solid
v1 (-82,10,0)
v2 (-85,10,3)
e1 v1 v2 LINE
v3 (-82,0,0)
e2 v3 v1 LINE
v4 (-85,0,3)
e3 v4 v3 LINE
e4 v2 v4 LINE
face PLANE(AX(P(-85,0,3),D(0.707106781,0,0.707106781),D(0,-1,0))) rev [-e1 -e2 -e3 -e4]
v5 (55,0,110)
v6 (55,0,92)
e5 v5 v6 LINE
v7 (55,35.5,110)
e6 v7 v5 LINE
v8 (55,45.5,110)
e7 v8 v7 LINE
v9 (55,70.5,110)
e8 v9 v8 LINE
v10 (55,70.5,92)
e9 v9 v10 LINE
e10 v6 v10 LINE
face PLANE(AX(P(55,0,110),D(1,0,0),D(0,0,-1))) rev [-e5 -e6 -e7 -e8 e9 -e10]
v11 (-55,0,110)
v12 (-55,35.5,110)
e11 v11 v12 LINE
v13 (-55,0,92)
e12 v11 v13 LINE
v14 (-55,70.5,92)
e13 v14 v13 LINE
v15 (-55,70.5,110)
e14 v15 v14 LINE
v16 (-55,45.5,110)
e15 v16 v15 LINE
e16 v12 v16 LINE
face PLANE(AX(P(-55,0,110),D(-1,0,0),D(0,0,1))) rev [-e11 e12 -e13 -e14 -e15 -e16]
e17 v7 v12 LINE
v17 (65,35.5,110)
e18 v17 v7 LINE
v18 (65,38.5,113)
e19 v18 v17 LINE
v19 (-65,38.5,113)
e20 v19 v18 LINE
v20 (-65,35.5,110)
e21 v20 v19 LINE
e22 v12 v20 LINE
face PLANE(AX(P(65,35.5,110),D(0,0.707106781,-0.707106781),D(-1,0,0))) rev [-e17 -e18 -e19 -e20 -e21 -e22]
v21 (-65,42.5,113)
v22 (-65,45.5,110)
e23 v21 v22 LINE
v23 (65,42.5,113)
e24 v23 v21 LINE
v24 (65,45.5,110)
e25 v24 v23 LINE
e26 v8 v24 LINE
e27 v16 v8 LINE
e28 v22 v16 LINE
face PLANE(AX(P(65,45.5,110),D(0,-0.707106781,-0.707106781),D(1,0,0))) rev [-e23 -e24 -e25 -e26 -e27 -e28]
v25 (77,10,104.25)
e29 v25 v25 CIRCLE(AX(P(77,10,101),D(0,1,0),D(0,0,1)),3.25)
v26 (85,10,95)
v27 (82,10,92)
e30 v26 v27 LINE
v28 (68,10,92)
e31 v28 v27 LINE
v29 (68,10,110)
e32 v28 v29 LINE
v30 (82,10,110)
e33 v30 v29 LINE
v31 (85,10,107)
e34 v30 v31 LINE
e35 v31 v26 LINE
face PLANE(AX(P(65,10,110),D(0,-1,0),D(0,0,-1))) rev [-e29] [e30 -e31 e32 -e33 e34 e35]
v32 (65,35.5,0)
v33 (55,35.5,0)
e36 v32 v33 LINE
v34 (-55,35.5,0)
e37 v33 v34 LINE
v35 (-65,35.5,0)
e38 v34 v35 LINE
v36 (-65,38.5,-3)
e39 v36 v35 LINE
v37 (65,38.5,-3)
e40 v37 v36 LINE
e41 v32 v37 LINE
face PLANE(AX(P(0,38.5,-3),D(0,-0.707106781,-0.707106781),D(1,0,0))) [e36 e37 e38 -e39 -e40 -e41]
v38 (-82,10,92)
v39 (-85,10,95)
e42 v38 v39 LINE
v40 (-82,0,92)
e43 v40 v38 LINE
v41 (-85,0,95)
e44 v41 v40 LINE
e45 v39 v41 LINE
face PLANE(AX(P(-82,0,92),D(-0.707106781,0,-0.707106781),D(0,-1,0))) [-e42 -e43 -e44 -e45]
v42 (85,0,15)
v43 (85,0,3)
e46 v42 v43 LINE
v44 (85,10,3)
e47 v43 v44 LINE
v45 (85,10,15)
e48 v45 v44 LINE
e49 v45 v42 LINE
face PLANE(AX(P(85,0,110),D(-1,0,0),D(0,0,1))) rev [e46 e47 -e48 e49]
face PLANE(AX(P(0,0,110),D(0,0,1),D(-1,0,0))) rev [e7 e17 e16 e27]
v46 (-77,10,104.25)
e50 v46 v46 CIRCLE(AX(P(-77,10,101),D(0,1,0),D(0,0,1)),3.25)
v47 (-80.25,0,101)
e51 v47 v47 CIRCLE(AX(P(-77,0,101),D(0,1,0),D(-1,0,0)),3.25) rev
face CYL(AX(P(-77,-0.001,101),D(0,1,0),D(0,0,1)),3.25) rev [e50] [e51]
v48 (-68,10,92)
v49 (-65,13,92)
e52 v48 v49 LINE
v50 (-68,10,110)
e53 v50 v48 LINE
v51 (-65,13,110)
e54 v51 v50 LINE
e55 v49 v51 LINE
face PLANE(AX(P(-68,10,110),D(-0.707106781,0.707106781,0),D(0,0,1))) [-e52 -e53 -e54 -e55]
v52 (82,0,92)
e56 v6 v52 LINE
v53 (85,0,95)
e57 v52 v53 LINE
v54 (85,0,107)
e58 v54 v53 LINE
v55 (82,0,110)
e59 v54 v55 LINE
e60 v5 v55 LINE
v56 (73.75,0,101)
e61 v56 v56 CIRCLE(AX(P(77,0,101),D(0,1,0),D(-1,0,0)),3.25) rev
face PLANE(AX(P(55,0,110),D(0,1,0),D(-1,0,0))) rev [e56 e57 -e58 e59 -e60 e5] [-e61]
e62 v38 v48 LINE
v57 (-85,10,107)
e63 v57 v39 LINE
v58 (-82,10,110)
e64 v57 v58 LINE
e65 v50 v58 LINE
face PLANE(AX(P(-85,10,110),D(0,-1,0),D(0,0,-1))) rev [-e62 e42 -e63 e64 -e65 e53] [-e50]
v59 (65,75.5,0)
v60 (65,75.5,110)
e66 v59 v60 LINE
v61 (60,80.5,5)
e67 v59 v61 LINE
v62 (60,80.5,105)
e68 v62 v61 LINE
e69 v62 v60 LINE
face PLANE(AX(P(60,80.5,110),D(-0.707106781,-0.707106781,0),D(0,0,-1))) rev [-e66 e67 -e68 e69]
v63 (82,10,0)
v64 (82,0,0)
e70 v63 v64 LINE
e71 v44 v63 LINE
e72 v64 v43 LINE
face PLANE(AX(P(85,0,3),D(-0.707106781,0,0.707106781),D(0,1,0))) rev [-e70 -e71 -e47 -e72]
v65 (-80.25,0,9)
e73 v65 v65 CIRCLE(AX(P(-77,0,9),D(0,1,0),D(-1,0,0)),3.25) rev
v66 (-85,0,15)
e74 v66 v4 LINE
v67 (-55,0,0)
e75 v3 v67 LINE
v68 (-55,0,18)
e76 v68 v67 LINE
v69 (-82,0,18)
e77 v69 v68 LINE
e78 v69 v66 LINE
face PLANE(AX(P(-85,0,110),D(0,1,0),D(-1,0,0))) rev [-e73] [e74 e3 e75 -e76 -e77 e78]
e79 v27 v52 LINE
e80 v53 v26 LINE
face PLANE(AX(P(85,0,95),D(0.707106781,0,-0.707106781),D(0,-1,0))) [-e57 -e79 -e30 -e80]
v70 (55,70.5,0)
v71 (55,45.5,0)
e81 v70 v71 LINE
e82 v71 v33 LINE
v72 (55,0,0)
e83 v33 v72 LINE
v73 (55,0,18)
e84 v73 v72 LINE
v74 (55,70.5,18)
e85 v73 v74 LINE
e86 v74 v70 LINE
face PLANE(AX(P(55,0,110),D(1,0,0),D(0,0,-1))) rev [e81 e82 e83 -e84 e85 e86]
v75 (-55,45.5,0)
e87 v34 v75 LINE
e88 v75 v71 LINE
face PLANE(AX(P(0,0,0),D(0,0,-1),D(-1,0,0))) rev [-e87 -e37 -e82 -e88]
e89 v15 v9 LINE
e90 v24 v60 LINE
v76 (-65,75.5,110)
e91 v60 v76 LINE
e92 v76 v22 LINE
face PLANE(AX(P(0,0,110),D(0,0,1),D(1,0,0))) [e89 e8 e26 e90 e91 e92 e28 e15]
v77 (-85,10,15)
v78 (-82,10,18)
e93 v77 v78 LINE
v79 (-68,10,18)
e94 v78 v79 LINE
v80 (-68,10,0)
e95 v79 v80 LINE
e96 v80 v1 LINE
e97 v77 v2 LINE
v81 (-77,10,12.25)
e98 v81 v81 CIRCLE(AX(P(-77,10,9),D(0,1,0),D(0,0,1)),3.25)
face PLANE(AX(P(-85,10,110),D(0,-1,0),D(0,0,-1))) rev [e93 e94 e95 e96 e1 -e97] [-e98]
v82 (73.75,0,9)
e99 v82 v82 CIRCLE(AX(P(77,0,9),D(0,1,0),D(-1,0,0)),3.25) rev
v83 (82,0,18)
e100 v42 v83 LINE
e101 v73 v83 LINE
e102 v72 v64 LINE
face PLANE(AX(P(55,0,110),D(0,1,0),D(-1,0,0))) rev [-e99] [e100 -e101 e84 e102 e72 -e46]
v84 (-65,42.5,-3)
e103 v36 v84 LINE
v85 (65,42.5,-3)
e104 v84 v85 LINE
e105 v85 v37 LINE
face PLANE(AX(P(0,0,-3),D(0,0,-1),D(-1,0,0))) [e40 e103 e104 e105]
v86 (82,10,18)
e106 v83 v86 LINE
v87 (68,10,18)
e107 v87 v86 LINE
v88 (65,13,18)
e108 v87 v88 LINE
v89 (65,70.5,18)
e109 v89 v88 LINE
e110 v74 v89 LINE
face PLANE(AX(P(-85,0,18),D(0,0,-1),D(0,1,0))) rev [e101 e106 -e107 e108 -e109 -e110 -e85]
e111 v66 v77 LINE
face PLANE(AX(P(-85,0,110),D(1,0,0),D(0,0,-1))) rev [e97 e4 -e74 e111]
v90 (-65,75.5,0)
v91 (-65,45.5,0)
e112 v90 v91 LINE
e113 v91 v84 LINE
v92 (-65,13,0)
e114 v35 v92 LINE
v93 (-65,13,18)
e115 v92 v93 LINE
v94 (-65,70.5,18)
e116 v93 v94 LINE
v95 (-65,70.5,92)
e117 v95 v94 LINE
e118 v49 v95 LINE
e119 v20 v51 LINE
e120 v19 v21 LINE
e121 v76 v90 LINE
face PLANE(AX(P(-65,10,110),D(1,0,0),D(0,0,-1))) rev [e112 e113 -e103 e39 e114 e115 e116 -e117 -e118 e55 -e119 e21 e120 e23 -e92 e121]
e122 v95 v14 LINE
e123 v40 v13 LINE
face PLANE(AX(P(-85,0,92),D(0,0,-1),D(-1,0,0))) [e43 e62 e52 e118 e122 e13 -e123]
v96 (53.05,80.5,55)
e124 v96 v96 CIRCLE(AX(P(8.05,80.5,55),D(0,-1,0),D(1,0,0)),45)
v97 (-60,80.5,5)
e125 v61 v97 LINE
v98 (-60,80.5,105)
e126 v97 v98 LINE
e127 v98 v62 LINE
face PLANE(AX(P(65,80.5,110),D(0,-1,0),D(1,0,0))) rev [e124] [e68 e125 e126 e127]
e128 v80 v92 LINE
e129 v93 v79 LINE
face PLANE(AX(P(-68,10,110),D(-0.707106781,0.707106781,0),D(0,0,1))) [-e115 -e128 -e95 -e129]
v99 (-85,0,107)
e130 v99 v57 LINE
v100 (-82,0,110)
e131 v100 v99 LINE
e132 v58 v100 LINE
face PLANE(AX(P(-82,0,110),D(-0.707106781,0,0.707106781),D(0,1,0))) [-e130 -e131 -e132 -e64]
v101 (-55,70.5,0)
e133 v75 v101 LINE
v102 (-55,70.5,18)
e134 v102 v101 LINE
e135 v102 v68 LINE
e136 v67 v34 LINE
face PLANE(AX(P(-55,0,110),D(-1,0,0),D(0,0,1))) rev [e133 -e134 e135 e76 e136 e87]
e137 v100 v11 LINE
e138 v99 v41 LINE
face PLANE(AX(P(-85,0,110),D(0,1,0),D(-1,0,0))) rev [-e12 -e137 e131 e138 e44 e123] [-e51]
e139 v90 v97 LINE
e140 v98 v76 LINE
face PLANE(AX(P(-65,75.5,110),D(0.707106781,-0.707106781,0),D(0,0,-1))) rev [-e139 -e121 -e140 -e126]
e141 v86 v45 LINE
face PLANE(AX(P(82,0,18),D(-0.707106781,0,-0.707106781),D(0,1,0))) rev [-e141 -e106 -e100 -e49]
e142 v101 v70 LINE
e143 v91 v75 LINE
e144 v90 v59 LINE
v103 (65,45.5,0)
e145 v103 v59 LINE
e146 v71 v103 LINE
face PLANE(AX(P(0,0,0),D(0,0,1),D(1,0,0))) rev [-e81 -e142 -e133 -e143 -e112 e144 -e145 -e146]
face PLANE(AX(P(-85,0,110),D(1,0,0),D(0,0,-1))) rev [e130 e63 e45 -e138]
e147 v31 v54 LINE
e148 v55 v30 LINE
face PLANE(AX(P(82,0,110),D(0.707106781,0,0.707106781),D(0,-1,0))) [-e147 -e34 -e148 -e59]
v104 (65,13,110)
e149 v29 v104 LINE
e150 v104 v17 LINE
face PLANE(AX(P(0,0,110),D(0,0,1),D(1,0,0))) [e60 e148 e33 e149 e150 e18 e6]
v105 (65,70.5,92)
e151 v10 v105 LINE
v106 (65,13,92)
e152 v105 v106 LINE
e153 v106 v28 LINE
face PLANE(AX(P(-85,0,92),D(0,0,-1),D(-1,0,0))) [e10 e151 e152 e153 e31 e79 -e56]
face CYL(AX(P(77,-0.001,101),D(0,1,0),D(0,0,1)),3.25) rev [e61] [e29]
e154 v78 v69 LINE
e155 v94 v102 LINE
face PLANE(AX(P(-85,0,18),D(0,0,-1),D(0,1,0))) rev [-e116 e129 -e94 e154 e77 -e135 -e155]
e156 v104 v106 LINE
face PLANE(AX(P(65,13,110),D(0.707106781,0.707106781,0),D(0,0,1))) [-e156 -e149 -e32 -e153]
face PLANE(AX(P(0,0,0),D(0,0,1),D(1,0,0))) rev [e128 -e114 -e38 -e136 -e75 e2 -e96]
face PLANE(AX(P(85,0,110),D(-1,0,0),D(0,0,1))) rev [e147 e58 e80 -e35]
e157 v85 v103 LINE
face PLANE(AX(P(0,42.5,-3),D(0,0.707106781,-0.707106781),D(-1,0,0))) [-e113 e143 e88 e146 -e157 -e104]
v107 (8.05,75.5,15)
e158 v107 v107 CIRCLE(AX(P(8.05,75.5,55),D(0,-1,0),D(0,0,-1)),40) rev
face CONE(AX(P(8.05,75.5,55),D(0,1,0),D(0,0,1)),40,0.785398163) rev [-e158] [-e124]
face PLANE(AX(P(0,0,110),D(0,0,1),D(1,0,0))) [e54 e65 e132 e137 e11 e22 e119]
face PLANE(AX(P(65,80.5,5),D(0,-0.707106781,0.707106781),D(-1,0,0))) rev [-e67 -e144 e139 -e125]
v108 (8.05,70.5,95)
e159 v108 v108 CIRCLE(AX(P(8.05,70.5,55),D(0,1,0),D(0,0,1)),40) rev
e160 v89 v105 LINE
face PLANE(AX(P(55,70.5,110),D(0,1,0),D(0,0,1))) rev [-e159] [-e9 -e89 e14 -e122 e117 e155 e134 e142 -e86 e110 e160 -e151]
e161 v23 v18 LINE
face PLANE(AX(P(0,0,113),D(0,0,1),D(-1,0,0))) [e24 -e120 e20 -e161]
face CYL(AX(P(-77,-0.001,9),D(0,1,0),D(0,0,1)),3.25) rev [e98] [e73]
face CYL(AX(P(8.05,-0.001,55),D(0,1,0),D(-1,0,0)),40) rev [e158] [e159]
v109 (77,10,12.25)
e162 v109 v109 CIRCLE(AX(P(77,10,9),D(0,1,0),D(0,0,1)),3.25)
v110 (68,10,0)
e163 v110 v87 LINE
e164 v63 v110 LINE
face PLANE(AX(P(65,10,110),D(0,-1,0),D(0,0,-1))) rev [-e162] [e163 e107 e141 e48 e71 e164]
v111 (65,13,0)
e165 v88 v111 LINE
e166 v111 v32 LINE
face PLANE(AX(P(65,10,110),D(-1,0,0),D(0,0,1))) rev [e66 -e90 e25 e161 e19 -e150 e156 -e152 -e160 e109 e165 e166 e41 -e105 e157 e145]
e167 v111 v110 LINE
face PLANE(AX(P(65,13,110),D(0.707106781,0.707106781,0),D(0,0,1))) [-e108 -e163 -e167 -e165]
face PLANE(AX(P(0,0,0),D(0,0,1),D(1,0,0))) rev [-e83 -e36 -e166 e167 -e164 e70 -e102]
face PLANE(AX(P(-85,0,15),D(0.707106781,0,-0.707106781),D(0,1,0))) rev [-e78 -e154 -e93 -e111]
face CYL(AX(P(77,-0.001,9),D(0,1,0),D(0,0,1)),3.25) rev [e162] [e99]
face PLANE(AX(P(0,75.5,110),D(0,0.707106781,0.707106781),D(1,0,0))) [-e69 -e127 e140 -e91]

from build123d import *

# Parameters (mm, degrees)
BOSS_EXTRUDE2_DEPTH = 110
SKETCH4_W           = 74
SKETCH4_H           = 70.5
CUT_EXTRUDE2_DEPTH  = 218.899632859
CUT_EXTRUDE3_REACH  = 162.64
SKETCH5_R           = 40
CUT_EXTRUDE4_REACH  = 157.869
SKETCH6_R           = 3.25
SKETCH7_W           = 130
SKETCH7_H           = 10
BOSS_EXTRUDE3_DEPTH = 3
CHAMFER1_SIZE       = 3
CHAMFER2_SIZE       = 5
CHAMFER3_SIZE       = 3
CHAMFER5_SIZE       = 3


# Some blends are built 0.0001 mm under size
with BuildPart() as part:
    # Sketch3 → Boss-Extrude2 (new body)
    with BuildSketch(Plane.XY):
        Polygon((65, 10), (85, 10), (85, 0), (55, 0), (55, 70.5), (-55, 70.5), (-55, 0), (-85, 0), (-85, 10), (-65, 10), (-65, 80.5), (65, 80.5), align=None)
    extrude(amount=BOSS_EXTRUDE2_DEPTH)

    # Sketch4 → Cut-Extrude2 (cut, through all)
    with BuildSketch(Plane(origin=(85, 0, 0), x_dir=(0, 0, -1), z_dir=(1, 0, 0))):
        with Locations((-55, 35.25)):
            Rectangle(SKETCH4_W, SKETCH4_H)
    extrude(amount=-CUT_EXTRUDE2_DEPTH, mode=Mode.SUBTRACT)

    # Sketch5 → Cut-Extrude3 (cut, up to next)
    with BuildSketch(Plane(origin=(0, 80.5, 0), x_dir=(1, 0, 0), z_dir=(0, 1, 0)), mode=Mode.PRIVATE) as cut_extrude3_sk1:
        with Locations(Location((8.05, -55, 0), (0, 0, 180))):
            Circle(SKETCH5_R)
    cut_extrude3_tool1 = extrude(cut_extrude3_sk1.sketch, amount=-CUT_EXTRUDE3_REACH, mode=Mode.PRIVATE) & part.part
    add(cut_extrude3_tool1.solids().sort_by_distance((8.05, 80.5, 55))[0], mode=Mode.SUBTRACT)

    # Sketch6 → Cut-Extrude4 (cut, up to next)
    with BuildSketch(Plane(origin=(0, 10, 0), x_dir=(1, 0, 0), z_dir=(0, 1, 0)), mode=Mode.PRIVATE) as cut_extrude4_sk1:
        with Locations(Location((77, -101, 0), (0, 0, 270))):
            Circle(SKETCH6_R)
    cut_extrude4_tool1 = extrude(cut_extrude4_sk1.sketch, amount=-CUT_EXTRUDE4_REACH, mode=Mode.PRIVATE) & part.part
    # Sketch6 → Cut-Extrude4 (cut, up to next)
    with BuildSketch(Plane(origin=(0, 10, 0), x_dir=(1, 0, 0), z_dir=(0, 1, 0)), mode=Mode.PRIVATE) as cut_extrude4_sk2:
        with Locations(Location((77, -9, 0), (0, 0, 270))):
            Circle(SKETCH6_R)
    cut_extrude4_tool2 = extrude(cut_extrude4_sk2.sketch, amount=-CUT_EXTRUDE4_REACH, mode=Mode.PRIVATE) & part.part
    # Sketch6 → Cut-Extrude4 (cut, up to next)
    with BuildSketch(Plane(origin=(0, 10, 0), x_dir=(1, 0, 0), z_dir=(0, 1, 0)), mode=Mode.PRIVATE) as cut_extrude4_sk3:
        with Locations(Location((-77, -9, 0), (0, 0, 270))):
            Circle(SKETCH6_R)
    cut_extrude4_tool3 = extrude(cut_extrude4_sk3.sketch, amount=-CUT_EXTRUDE4_REACH, mode=Mode.PRIVATE) & part.part
    # Sketch6 → Cut-Extrude4 (cut, up to next)
    with BuildSketch(Plane(origin=(0, 10, 0), x_dir=(1, 0, 0), z_dir=(0, 1, 0)), mode=Mode.PRIVATE) as cut_extrude4_sk4:
        with Locations(Location((-77, -101, 0), (0, 0, 270))):
            Circle(SKETCH6_R)
    cut_extrude4_tool4 = extrude(cut_extrude4_sk4.sketch, amount=-CUT_EXTRUDE4_REACH, mode=Mode.PRIVATE) & part.part
    add(cut_extrude4_tool1.solids().sort_by_distance((77, 10, 101))[0], mode=Mode.SUBTRACT)
    add(cut_extrude4_tool2.solids().sort_by_distance((77, 10, 9))[0], mode=Mode.SUBTRACT)
    add(cut_extrude4_tool3.solids().sort_by_distance((-77, 10, 9))[0], mode=Mode.SUBTRACT)
    add(cut_extrude4_tool4.solids().sort_by_distance((-77, 10, 101))[0], mode=Mode.SUBTRACT)

    # Sketch7 → Boss-Extrude3 (add)
    with BuildSketch(Plane(origin=(0, 0, 0), x_dir=(-1, 0, 0), z_dir=(0, 0, -1))):
        with Locations((0, 40.5)):
            Rectangle(SKETCH7_W, SKETCH7_H)
    boss_extrude3 = extrude(amount=BOSS_EXTRUDE3_DEPTH)

    # Mirror1: Boss-Extrude3 across plane
    add(boss_extrude3.mirror(Plane.XY.offset(55)))

    # Chamfer1
    chamfer1_edges = [part.edges().sort_by_distance(p)[0] for p in [
        (0, 35.5, -3),
        (0, 45.5, -3),
    ]]
    chamfer(chamfer1_edges, length=CHAMFER1_SIZE - 0.0001)  # a hair under: the kernel refuses the full size

    # Chamfer2
    chamfer2_edges = [part.edges().sort_by_distance(p)[0] for p in [
        (0, 80.5, 0),
        (0, 80.5, 110),
        (-65, 80.5, 55),
        (65, 80.5, 55),
        (48.05, 80.5, 55),
    ]]
    chamfer(chamfer2_edges, length=CHAMFER2_SIZE)

    # Chamfer3
    # the kernel refuses this chamfer: 3 mm, written as the material it takes off along each edge
    with BuildSketch(Plane(origin=(-72.715048964, 35.5, 113), x_dir=(0, 0.9996219169112965, 0.02749587661058676), z_dir=(1, 0, 0))) as chamfer3_piece_1:
        Polygon((CHAMFER3_SIZE * 0.999621916911, -CHAMFER3_SIZE * 0.0274958766106), (-CHAMFER3_SIZE * 0.0274958766106, -CHAMFER3_SIZE * 0.999621916911), (0, 0), align=None)
    extrude(amount=145.430097928, mode=Mode.SUBTRACT)
    with BuildSketch(Plane(origin=(72.715048964, 45.5, 113), x_dir=(0, 0.027495876610586768, -0.9996219169112968), z_dir=(-1, 0, 0))) as chamfer3_piece_2:
        Polygon((CHAMFER3_SIZE * 0.999621916911, CHAMFER3_SIZE * 0.0274958766106), (-CHAMFER3_SIZE * 0.0274958766106, CHAMFER3_SIZE * 0.999621916911), (0, 0), align=None)
    extrude(amount=145.430097928, mode=Mode.SUBTRACT)

    # Chamfer5
    chamfer5_edges = [part.edges().sort_by_distance(p)[0] for p in [
        (-85, 5, 0),
        (85, 5, 0),
        (-65, 10, 101),
        (65, 10, 101),
        (-85, 5, 110),
        (-65, 10, 9),
        (65, 10, 9),
        (85, 5, 18),
        (-85, 5, 92),
        (-85, 5, 18),
        (85, 5, 92),
        (85, 5, 110),
    ]]
    chamfer(chamfer5_edges, length=CHAMFER5_SIZE)


solid = part.part
